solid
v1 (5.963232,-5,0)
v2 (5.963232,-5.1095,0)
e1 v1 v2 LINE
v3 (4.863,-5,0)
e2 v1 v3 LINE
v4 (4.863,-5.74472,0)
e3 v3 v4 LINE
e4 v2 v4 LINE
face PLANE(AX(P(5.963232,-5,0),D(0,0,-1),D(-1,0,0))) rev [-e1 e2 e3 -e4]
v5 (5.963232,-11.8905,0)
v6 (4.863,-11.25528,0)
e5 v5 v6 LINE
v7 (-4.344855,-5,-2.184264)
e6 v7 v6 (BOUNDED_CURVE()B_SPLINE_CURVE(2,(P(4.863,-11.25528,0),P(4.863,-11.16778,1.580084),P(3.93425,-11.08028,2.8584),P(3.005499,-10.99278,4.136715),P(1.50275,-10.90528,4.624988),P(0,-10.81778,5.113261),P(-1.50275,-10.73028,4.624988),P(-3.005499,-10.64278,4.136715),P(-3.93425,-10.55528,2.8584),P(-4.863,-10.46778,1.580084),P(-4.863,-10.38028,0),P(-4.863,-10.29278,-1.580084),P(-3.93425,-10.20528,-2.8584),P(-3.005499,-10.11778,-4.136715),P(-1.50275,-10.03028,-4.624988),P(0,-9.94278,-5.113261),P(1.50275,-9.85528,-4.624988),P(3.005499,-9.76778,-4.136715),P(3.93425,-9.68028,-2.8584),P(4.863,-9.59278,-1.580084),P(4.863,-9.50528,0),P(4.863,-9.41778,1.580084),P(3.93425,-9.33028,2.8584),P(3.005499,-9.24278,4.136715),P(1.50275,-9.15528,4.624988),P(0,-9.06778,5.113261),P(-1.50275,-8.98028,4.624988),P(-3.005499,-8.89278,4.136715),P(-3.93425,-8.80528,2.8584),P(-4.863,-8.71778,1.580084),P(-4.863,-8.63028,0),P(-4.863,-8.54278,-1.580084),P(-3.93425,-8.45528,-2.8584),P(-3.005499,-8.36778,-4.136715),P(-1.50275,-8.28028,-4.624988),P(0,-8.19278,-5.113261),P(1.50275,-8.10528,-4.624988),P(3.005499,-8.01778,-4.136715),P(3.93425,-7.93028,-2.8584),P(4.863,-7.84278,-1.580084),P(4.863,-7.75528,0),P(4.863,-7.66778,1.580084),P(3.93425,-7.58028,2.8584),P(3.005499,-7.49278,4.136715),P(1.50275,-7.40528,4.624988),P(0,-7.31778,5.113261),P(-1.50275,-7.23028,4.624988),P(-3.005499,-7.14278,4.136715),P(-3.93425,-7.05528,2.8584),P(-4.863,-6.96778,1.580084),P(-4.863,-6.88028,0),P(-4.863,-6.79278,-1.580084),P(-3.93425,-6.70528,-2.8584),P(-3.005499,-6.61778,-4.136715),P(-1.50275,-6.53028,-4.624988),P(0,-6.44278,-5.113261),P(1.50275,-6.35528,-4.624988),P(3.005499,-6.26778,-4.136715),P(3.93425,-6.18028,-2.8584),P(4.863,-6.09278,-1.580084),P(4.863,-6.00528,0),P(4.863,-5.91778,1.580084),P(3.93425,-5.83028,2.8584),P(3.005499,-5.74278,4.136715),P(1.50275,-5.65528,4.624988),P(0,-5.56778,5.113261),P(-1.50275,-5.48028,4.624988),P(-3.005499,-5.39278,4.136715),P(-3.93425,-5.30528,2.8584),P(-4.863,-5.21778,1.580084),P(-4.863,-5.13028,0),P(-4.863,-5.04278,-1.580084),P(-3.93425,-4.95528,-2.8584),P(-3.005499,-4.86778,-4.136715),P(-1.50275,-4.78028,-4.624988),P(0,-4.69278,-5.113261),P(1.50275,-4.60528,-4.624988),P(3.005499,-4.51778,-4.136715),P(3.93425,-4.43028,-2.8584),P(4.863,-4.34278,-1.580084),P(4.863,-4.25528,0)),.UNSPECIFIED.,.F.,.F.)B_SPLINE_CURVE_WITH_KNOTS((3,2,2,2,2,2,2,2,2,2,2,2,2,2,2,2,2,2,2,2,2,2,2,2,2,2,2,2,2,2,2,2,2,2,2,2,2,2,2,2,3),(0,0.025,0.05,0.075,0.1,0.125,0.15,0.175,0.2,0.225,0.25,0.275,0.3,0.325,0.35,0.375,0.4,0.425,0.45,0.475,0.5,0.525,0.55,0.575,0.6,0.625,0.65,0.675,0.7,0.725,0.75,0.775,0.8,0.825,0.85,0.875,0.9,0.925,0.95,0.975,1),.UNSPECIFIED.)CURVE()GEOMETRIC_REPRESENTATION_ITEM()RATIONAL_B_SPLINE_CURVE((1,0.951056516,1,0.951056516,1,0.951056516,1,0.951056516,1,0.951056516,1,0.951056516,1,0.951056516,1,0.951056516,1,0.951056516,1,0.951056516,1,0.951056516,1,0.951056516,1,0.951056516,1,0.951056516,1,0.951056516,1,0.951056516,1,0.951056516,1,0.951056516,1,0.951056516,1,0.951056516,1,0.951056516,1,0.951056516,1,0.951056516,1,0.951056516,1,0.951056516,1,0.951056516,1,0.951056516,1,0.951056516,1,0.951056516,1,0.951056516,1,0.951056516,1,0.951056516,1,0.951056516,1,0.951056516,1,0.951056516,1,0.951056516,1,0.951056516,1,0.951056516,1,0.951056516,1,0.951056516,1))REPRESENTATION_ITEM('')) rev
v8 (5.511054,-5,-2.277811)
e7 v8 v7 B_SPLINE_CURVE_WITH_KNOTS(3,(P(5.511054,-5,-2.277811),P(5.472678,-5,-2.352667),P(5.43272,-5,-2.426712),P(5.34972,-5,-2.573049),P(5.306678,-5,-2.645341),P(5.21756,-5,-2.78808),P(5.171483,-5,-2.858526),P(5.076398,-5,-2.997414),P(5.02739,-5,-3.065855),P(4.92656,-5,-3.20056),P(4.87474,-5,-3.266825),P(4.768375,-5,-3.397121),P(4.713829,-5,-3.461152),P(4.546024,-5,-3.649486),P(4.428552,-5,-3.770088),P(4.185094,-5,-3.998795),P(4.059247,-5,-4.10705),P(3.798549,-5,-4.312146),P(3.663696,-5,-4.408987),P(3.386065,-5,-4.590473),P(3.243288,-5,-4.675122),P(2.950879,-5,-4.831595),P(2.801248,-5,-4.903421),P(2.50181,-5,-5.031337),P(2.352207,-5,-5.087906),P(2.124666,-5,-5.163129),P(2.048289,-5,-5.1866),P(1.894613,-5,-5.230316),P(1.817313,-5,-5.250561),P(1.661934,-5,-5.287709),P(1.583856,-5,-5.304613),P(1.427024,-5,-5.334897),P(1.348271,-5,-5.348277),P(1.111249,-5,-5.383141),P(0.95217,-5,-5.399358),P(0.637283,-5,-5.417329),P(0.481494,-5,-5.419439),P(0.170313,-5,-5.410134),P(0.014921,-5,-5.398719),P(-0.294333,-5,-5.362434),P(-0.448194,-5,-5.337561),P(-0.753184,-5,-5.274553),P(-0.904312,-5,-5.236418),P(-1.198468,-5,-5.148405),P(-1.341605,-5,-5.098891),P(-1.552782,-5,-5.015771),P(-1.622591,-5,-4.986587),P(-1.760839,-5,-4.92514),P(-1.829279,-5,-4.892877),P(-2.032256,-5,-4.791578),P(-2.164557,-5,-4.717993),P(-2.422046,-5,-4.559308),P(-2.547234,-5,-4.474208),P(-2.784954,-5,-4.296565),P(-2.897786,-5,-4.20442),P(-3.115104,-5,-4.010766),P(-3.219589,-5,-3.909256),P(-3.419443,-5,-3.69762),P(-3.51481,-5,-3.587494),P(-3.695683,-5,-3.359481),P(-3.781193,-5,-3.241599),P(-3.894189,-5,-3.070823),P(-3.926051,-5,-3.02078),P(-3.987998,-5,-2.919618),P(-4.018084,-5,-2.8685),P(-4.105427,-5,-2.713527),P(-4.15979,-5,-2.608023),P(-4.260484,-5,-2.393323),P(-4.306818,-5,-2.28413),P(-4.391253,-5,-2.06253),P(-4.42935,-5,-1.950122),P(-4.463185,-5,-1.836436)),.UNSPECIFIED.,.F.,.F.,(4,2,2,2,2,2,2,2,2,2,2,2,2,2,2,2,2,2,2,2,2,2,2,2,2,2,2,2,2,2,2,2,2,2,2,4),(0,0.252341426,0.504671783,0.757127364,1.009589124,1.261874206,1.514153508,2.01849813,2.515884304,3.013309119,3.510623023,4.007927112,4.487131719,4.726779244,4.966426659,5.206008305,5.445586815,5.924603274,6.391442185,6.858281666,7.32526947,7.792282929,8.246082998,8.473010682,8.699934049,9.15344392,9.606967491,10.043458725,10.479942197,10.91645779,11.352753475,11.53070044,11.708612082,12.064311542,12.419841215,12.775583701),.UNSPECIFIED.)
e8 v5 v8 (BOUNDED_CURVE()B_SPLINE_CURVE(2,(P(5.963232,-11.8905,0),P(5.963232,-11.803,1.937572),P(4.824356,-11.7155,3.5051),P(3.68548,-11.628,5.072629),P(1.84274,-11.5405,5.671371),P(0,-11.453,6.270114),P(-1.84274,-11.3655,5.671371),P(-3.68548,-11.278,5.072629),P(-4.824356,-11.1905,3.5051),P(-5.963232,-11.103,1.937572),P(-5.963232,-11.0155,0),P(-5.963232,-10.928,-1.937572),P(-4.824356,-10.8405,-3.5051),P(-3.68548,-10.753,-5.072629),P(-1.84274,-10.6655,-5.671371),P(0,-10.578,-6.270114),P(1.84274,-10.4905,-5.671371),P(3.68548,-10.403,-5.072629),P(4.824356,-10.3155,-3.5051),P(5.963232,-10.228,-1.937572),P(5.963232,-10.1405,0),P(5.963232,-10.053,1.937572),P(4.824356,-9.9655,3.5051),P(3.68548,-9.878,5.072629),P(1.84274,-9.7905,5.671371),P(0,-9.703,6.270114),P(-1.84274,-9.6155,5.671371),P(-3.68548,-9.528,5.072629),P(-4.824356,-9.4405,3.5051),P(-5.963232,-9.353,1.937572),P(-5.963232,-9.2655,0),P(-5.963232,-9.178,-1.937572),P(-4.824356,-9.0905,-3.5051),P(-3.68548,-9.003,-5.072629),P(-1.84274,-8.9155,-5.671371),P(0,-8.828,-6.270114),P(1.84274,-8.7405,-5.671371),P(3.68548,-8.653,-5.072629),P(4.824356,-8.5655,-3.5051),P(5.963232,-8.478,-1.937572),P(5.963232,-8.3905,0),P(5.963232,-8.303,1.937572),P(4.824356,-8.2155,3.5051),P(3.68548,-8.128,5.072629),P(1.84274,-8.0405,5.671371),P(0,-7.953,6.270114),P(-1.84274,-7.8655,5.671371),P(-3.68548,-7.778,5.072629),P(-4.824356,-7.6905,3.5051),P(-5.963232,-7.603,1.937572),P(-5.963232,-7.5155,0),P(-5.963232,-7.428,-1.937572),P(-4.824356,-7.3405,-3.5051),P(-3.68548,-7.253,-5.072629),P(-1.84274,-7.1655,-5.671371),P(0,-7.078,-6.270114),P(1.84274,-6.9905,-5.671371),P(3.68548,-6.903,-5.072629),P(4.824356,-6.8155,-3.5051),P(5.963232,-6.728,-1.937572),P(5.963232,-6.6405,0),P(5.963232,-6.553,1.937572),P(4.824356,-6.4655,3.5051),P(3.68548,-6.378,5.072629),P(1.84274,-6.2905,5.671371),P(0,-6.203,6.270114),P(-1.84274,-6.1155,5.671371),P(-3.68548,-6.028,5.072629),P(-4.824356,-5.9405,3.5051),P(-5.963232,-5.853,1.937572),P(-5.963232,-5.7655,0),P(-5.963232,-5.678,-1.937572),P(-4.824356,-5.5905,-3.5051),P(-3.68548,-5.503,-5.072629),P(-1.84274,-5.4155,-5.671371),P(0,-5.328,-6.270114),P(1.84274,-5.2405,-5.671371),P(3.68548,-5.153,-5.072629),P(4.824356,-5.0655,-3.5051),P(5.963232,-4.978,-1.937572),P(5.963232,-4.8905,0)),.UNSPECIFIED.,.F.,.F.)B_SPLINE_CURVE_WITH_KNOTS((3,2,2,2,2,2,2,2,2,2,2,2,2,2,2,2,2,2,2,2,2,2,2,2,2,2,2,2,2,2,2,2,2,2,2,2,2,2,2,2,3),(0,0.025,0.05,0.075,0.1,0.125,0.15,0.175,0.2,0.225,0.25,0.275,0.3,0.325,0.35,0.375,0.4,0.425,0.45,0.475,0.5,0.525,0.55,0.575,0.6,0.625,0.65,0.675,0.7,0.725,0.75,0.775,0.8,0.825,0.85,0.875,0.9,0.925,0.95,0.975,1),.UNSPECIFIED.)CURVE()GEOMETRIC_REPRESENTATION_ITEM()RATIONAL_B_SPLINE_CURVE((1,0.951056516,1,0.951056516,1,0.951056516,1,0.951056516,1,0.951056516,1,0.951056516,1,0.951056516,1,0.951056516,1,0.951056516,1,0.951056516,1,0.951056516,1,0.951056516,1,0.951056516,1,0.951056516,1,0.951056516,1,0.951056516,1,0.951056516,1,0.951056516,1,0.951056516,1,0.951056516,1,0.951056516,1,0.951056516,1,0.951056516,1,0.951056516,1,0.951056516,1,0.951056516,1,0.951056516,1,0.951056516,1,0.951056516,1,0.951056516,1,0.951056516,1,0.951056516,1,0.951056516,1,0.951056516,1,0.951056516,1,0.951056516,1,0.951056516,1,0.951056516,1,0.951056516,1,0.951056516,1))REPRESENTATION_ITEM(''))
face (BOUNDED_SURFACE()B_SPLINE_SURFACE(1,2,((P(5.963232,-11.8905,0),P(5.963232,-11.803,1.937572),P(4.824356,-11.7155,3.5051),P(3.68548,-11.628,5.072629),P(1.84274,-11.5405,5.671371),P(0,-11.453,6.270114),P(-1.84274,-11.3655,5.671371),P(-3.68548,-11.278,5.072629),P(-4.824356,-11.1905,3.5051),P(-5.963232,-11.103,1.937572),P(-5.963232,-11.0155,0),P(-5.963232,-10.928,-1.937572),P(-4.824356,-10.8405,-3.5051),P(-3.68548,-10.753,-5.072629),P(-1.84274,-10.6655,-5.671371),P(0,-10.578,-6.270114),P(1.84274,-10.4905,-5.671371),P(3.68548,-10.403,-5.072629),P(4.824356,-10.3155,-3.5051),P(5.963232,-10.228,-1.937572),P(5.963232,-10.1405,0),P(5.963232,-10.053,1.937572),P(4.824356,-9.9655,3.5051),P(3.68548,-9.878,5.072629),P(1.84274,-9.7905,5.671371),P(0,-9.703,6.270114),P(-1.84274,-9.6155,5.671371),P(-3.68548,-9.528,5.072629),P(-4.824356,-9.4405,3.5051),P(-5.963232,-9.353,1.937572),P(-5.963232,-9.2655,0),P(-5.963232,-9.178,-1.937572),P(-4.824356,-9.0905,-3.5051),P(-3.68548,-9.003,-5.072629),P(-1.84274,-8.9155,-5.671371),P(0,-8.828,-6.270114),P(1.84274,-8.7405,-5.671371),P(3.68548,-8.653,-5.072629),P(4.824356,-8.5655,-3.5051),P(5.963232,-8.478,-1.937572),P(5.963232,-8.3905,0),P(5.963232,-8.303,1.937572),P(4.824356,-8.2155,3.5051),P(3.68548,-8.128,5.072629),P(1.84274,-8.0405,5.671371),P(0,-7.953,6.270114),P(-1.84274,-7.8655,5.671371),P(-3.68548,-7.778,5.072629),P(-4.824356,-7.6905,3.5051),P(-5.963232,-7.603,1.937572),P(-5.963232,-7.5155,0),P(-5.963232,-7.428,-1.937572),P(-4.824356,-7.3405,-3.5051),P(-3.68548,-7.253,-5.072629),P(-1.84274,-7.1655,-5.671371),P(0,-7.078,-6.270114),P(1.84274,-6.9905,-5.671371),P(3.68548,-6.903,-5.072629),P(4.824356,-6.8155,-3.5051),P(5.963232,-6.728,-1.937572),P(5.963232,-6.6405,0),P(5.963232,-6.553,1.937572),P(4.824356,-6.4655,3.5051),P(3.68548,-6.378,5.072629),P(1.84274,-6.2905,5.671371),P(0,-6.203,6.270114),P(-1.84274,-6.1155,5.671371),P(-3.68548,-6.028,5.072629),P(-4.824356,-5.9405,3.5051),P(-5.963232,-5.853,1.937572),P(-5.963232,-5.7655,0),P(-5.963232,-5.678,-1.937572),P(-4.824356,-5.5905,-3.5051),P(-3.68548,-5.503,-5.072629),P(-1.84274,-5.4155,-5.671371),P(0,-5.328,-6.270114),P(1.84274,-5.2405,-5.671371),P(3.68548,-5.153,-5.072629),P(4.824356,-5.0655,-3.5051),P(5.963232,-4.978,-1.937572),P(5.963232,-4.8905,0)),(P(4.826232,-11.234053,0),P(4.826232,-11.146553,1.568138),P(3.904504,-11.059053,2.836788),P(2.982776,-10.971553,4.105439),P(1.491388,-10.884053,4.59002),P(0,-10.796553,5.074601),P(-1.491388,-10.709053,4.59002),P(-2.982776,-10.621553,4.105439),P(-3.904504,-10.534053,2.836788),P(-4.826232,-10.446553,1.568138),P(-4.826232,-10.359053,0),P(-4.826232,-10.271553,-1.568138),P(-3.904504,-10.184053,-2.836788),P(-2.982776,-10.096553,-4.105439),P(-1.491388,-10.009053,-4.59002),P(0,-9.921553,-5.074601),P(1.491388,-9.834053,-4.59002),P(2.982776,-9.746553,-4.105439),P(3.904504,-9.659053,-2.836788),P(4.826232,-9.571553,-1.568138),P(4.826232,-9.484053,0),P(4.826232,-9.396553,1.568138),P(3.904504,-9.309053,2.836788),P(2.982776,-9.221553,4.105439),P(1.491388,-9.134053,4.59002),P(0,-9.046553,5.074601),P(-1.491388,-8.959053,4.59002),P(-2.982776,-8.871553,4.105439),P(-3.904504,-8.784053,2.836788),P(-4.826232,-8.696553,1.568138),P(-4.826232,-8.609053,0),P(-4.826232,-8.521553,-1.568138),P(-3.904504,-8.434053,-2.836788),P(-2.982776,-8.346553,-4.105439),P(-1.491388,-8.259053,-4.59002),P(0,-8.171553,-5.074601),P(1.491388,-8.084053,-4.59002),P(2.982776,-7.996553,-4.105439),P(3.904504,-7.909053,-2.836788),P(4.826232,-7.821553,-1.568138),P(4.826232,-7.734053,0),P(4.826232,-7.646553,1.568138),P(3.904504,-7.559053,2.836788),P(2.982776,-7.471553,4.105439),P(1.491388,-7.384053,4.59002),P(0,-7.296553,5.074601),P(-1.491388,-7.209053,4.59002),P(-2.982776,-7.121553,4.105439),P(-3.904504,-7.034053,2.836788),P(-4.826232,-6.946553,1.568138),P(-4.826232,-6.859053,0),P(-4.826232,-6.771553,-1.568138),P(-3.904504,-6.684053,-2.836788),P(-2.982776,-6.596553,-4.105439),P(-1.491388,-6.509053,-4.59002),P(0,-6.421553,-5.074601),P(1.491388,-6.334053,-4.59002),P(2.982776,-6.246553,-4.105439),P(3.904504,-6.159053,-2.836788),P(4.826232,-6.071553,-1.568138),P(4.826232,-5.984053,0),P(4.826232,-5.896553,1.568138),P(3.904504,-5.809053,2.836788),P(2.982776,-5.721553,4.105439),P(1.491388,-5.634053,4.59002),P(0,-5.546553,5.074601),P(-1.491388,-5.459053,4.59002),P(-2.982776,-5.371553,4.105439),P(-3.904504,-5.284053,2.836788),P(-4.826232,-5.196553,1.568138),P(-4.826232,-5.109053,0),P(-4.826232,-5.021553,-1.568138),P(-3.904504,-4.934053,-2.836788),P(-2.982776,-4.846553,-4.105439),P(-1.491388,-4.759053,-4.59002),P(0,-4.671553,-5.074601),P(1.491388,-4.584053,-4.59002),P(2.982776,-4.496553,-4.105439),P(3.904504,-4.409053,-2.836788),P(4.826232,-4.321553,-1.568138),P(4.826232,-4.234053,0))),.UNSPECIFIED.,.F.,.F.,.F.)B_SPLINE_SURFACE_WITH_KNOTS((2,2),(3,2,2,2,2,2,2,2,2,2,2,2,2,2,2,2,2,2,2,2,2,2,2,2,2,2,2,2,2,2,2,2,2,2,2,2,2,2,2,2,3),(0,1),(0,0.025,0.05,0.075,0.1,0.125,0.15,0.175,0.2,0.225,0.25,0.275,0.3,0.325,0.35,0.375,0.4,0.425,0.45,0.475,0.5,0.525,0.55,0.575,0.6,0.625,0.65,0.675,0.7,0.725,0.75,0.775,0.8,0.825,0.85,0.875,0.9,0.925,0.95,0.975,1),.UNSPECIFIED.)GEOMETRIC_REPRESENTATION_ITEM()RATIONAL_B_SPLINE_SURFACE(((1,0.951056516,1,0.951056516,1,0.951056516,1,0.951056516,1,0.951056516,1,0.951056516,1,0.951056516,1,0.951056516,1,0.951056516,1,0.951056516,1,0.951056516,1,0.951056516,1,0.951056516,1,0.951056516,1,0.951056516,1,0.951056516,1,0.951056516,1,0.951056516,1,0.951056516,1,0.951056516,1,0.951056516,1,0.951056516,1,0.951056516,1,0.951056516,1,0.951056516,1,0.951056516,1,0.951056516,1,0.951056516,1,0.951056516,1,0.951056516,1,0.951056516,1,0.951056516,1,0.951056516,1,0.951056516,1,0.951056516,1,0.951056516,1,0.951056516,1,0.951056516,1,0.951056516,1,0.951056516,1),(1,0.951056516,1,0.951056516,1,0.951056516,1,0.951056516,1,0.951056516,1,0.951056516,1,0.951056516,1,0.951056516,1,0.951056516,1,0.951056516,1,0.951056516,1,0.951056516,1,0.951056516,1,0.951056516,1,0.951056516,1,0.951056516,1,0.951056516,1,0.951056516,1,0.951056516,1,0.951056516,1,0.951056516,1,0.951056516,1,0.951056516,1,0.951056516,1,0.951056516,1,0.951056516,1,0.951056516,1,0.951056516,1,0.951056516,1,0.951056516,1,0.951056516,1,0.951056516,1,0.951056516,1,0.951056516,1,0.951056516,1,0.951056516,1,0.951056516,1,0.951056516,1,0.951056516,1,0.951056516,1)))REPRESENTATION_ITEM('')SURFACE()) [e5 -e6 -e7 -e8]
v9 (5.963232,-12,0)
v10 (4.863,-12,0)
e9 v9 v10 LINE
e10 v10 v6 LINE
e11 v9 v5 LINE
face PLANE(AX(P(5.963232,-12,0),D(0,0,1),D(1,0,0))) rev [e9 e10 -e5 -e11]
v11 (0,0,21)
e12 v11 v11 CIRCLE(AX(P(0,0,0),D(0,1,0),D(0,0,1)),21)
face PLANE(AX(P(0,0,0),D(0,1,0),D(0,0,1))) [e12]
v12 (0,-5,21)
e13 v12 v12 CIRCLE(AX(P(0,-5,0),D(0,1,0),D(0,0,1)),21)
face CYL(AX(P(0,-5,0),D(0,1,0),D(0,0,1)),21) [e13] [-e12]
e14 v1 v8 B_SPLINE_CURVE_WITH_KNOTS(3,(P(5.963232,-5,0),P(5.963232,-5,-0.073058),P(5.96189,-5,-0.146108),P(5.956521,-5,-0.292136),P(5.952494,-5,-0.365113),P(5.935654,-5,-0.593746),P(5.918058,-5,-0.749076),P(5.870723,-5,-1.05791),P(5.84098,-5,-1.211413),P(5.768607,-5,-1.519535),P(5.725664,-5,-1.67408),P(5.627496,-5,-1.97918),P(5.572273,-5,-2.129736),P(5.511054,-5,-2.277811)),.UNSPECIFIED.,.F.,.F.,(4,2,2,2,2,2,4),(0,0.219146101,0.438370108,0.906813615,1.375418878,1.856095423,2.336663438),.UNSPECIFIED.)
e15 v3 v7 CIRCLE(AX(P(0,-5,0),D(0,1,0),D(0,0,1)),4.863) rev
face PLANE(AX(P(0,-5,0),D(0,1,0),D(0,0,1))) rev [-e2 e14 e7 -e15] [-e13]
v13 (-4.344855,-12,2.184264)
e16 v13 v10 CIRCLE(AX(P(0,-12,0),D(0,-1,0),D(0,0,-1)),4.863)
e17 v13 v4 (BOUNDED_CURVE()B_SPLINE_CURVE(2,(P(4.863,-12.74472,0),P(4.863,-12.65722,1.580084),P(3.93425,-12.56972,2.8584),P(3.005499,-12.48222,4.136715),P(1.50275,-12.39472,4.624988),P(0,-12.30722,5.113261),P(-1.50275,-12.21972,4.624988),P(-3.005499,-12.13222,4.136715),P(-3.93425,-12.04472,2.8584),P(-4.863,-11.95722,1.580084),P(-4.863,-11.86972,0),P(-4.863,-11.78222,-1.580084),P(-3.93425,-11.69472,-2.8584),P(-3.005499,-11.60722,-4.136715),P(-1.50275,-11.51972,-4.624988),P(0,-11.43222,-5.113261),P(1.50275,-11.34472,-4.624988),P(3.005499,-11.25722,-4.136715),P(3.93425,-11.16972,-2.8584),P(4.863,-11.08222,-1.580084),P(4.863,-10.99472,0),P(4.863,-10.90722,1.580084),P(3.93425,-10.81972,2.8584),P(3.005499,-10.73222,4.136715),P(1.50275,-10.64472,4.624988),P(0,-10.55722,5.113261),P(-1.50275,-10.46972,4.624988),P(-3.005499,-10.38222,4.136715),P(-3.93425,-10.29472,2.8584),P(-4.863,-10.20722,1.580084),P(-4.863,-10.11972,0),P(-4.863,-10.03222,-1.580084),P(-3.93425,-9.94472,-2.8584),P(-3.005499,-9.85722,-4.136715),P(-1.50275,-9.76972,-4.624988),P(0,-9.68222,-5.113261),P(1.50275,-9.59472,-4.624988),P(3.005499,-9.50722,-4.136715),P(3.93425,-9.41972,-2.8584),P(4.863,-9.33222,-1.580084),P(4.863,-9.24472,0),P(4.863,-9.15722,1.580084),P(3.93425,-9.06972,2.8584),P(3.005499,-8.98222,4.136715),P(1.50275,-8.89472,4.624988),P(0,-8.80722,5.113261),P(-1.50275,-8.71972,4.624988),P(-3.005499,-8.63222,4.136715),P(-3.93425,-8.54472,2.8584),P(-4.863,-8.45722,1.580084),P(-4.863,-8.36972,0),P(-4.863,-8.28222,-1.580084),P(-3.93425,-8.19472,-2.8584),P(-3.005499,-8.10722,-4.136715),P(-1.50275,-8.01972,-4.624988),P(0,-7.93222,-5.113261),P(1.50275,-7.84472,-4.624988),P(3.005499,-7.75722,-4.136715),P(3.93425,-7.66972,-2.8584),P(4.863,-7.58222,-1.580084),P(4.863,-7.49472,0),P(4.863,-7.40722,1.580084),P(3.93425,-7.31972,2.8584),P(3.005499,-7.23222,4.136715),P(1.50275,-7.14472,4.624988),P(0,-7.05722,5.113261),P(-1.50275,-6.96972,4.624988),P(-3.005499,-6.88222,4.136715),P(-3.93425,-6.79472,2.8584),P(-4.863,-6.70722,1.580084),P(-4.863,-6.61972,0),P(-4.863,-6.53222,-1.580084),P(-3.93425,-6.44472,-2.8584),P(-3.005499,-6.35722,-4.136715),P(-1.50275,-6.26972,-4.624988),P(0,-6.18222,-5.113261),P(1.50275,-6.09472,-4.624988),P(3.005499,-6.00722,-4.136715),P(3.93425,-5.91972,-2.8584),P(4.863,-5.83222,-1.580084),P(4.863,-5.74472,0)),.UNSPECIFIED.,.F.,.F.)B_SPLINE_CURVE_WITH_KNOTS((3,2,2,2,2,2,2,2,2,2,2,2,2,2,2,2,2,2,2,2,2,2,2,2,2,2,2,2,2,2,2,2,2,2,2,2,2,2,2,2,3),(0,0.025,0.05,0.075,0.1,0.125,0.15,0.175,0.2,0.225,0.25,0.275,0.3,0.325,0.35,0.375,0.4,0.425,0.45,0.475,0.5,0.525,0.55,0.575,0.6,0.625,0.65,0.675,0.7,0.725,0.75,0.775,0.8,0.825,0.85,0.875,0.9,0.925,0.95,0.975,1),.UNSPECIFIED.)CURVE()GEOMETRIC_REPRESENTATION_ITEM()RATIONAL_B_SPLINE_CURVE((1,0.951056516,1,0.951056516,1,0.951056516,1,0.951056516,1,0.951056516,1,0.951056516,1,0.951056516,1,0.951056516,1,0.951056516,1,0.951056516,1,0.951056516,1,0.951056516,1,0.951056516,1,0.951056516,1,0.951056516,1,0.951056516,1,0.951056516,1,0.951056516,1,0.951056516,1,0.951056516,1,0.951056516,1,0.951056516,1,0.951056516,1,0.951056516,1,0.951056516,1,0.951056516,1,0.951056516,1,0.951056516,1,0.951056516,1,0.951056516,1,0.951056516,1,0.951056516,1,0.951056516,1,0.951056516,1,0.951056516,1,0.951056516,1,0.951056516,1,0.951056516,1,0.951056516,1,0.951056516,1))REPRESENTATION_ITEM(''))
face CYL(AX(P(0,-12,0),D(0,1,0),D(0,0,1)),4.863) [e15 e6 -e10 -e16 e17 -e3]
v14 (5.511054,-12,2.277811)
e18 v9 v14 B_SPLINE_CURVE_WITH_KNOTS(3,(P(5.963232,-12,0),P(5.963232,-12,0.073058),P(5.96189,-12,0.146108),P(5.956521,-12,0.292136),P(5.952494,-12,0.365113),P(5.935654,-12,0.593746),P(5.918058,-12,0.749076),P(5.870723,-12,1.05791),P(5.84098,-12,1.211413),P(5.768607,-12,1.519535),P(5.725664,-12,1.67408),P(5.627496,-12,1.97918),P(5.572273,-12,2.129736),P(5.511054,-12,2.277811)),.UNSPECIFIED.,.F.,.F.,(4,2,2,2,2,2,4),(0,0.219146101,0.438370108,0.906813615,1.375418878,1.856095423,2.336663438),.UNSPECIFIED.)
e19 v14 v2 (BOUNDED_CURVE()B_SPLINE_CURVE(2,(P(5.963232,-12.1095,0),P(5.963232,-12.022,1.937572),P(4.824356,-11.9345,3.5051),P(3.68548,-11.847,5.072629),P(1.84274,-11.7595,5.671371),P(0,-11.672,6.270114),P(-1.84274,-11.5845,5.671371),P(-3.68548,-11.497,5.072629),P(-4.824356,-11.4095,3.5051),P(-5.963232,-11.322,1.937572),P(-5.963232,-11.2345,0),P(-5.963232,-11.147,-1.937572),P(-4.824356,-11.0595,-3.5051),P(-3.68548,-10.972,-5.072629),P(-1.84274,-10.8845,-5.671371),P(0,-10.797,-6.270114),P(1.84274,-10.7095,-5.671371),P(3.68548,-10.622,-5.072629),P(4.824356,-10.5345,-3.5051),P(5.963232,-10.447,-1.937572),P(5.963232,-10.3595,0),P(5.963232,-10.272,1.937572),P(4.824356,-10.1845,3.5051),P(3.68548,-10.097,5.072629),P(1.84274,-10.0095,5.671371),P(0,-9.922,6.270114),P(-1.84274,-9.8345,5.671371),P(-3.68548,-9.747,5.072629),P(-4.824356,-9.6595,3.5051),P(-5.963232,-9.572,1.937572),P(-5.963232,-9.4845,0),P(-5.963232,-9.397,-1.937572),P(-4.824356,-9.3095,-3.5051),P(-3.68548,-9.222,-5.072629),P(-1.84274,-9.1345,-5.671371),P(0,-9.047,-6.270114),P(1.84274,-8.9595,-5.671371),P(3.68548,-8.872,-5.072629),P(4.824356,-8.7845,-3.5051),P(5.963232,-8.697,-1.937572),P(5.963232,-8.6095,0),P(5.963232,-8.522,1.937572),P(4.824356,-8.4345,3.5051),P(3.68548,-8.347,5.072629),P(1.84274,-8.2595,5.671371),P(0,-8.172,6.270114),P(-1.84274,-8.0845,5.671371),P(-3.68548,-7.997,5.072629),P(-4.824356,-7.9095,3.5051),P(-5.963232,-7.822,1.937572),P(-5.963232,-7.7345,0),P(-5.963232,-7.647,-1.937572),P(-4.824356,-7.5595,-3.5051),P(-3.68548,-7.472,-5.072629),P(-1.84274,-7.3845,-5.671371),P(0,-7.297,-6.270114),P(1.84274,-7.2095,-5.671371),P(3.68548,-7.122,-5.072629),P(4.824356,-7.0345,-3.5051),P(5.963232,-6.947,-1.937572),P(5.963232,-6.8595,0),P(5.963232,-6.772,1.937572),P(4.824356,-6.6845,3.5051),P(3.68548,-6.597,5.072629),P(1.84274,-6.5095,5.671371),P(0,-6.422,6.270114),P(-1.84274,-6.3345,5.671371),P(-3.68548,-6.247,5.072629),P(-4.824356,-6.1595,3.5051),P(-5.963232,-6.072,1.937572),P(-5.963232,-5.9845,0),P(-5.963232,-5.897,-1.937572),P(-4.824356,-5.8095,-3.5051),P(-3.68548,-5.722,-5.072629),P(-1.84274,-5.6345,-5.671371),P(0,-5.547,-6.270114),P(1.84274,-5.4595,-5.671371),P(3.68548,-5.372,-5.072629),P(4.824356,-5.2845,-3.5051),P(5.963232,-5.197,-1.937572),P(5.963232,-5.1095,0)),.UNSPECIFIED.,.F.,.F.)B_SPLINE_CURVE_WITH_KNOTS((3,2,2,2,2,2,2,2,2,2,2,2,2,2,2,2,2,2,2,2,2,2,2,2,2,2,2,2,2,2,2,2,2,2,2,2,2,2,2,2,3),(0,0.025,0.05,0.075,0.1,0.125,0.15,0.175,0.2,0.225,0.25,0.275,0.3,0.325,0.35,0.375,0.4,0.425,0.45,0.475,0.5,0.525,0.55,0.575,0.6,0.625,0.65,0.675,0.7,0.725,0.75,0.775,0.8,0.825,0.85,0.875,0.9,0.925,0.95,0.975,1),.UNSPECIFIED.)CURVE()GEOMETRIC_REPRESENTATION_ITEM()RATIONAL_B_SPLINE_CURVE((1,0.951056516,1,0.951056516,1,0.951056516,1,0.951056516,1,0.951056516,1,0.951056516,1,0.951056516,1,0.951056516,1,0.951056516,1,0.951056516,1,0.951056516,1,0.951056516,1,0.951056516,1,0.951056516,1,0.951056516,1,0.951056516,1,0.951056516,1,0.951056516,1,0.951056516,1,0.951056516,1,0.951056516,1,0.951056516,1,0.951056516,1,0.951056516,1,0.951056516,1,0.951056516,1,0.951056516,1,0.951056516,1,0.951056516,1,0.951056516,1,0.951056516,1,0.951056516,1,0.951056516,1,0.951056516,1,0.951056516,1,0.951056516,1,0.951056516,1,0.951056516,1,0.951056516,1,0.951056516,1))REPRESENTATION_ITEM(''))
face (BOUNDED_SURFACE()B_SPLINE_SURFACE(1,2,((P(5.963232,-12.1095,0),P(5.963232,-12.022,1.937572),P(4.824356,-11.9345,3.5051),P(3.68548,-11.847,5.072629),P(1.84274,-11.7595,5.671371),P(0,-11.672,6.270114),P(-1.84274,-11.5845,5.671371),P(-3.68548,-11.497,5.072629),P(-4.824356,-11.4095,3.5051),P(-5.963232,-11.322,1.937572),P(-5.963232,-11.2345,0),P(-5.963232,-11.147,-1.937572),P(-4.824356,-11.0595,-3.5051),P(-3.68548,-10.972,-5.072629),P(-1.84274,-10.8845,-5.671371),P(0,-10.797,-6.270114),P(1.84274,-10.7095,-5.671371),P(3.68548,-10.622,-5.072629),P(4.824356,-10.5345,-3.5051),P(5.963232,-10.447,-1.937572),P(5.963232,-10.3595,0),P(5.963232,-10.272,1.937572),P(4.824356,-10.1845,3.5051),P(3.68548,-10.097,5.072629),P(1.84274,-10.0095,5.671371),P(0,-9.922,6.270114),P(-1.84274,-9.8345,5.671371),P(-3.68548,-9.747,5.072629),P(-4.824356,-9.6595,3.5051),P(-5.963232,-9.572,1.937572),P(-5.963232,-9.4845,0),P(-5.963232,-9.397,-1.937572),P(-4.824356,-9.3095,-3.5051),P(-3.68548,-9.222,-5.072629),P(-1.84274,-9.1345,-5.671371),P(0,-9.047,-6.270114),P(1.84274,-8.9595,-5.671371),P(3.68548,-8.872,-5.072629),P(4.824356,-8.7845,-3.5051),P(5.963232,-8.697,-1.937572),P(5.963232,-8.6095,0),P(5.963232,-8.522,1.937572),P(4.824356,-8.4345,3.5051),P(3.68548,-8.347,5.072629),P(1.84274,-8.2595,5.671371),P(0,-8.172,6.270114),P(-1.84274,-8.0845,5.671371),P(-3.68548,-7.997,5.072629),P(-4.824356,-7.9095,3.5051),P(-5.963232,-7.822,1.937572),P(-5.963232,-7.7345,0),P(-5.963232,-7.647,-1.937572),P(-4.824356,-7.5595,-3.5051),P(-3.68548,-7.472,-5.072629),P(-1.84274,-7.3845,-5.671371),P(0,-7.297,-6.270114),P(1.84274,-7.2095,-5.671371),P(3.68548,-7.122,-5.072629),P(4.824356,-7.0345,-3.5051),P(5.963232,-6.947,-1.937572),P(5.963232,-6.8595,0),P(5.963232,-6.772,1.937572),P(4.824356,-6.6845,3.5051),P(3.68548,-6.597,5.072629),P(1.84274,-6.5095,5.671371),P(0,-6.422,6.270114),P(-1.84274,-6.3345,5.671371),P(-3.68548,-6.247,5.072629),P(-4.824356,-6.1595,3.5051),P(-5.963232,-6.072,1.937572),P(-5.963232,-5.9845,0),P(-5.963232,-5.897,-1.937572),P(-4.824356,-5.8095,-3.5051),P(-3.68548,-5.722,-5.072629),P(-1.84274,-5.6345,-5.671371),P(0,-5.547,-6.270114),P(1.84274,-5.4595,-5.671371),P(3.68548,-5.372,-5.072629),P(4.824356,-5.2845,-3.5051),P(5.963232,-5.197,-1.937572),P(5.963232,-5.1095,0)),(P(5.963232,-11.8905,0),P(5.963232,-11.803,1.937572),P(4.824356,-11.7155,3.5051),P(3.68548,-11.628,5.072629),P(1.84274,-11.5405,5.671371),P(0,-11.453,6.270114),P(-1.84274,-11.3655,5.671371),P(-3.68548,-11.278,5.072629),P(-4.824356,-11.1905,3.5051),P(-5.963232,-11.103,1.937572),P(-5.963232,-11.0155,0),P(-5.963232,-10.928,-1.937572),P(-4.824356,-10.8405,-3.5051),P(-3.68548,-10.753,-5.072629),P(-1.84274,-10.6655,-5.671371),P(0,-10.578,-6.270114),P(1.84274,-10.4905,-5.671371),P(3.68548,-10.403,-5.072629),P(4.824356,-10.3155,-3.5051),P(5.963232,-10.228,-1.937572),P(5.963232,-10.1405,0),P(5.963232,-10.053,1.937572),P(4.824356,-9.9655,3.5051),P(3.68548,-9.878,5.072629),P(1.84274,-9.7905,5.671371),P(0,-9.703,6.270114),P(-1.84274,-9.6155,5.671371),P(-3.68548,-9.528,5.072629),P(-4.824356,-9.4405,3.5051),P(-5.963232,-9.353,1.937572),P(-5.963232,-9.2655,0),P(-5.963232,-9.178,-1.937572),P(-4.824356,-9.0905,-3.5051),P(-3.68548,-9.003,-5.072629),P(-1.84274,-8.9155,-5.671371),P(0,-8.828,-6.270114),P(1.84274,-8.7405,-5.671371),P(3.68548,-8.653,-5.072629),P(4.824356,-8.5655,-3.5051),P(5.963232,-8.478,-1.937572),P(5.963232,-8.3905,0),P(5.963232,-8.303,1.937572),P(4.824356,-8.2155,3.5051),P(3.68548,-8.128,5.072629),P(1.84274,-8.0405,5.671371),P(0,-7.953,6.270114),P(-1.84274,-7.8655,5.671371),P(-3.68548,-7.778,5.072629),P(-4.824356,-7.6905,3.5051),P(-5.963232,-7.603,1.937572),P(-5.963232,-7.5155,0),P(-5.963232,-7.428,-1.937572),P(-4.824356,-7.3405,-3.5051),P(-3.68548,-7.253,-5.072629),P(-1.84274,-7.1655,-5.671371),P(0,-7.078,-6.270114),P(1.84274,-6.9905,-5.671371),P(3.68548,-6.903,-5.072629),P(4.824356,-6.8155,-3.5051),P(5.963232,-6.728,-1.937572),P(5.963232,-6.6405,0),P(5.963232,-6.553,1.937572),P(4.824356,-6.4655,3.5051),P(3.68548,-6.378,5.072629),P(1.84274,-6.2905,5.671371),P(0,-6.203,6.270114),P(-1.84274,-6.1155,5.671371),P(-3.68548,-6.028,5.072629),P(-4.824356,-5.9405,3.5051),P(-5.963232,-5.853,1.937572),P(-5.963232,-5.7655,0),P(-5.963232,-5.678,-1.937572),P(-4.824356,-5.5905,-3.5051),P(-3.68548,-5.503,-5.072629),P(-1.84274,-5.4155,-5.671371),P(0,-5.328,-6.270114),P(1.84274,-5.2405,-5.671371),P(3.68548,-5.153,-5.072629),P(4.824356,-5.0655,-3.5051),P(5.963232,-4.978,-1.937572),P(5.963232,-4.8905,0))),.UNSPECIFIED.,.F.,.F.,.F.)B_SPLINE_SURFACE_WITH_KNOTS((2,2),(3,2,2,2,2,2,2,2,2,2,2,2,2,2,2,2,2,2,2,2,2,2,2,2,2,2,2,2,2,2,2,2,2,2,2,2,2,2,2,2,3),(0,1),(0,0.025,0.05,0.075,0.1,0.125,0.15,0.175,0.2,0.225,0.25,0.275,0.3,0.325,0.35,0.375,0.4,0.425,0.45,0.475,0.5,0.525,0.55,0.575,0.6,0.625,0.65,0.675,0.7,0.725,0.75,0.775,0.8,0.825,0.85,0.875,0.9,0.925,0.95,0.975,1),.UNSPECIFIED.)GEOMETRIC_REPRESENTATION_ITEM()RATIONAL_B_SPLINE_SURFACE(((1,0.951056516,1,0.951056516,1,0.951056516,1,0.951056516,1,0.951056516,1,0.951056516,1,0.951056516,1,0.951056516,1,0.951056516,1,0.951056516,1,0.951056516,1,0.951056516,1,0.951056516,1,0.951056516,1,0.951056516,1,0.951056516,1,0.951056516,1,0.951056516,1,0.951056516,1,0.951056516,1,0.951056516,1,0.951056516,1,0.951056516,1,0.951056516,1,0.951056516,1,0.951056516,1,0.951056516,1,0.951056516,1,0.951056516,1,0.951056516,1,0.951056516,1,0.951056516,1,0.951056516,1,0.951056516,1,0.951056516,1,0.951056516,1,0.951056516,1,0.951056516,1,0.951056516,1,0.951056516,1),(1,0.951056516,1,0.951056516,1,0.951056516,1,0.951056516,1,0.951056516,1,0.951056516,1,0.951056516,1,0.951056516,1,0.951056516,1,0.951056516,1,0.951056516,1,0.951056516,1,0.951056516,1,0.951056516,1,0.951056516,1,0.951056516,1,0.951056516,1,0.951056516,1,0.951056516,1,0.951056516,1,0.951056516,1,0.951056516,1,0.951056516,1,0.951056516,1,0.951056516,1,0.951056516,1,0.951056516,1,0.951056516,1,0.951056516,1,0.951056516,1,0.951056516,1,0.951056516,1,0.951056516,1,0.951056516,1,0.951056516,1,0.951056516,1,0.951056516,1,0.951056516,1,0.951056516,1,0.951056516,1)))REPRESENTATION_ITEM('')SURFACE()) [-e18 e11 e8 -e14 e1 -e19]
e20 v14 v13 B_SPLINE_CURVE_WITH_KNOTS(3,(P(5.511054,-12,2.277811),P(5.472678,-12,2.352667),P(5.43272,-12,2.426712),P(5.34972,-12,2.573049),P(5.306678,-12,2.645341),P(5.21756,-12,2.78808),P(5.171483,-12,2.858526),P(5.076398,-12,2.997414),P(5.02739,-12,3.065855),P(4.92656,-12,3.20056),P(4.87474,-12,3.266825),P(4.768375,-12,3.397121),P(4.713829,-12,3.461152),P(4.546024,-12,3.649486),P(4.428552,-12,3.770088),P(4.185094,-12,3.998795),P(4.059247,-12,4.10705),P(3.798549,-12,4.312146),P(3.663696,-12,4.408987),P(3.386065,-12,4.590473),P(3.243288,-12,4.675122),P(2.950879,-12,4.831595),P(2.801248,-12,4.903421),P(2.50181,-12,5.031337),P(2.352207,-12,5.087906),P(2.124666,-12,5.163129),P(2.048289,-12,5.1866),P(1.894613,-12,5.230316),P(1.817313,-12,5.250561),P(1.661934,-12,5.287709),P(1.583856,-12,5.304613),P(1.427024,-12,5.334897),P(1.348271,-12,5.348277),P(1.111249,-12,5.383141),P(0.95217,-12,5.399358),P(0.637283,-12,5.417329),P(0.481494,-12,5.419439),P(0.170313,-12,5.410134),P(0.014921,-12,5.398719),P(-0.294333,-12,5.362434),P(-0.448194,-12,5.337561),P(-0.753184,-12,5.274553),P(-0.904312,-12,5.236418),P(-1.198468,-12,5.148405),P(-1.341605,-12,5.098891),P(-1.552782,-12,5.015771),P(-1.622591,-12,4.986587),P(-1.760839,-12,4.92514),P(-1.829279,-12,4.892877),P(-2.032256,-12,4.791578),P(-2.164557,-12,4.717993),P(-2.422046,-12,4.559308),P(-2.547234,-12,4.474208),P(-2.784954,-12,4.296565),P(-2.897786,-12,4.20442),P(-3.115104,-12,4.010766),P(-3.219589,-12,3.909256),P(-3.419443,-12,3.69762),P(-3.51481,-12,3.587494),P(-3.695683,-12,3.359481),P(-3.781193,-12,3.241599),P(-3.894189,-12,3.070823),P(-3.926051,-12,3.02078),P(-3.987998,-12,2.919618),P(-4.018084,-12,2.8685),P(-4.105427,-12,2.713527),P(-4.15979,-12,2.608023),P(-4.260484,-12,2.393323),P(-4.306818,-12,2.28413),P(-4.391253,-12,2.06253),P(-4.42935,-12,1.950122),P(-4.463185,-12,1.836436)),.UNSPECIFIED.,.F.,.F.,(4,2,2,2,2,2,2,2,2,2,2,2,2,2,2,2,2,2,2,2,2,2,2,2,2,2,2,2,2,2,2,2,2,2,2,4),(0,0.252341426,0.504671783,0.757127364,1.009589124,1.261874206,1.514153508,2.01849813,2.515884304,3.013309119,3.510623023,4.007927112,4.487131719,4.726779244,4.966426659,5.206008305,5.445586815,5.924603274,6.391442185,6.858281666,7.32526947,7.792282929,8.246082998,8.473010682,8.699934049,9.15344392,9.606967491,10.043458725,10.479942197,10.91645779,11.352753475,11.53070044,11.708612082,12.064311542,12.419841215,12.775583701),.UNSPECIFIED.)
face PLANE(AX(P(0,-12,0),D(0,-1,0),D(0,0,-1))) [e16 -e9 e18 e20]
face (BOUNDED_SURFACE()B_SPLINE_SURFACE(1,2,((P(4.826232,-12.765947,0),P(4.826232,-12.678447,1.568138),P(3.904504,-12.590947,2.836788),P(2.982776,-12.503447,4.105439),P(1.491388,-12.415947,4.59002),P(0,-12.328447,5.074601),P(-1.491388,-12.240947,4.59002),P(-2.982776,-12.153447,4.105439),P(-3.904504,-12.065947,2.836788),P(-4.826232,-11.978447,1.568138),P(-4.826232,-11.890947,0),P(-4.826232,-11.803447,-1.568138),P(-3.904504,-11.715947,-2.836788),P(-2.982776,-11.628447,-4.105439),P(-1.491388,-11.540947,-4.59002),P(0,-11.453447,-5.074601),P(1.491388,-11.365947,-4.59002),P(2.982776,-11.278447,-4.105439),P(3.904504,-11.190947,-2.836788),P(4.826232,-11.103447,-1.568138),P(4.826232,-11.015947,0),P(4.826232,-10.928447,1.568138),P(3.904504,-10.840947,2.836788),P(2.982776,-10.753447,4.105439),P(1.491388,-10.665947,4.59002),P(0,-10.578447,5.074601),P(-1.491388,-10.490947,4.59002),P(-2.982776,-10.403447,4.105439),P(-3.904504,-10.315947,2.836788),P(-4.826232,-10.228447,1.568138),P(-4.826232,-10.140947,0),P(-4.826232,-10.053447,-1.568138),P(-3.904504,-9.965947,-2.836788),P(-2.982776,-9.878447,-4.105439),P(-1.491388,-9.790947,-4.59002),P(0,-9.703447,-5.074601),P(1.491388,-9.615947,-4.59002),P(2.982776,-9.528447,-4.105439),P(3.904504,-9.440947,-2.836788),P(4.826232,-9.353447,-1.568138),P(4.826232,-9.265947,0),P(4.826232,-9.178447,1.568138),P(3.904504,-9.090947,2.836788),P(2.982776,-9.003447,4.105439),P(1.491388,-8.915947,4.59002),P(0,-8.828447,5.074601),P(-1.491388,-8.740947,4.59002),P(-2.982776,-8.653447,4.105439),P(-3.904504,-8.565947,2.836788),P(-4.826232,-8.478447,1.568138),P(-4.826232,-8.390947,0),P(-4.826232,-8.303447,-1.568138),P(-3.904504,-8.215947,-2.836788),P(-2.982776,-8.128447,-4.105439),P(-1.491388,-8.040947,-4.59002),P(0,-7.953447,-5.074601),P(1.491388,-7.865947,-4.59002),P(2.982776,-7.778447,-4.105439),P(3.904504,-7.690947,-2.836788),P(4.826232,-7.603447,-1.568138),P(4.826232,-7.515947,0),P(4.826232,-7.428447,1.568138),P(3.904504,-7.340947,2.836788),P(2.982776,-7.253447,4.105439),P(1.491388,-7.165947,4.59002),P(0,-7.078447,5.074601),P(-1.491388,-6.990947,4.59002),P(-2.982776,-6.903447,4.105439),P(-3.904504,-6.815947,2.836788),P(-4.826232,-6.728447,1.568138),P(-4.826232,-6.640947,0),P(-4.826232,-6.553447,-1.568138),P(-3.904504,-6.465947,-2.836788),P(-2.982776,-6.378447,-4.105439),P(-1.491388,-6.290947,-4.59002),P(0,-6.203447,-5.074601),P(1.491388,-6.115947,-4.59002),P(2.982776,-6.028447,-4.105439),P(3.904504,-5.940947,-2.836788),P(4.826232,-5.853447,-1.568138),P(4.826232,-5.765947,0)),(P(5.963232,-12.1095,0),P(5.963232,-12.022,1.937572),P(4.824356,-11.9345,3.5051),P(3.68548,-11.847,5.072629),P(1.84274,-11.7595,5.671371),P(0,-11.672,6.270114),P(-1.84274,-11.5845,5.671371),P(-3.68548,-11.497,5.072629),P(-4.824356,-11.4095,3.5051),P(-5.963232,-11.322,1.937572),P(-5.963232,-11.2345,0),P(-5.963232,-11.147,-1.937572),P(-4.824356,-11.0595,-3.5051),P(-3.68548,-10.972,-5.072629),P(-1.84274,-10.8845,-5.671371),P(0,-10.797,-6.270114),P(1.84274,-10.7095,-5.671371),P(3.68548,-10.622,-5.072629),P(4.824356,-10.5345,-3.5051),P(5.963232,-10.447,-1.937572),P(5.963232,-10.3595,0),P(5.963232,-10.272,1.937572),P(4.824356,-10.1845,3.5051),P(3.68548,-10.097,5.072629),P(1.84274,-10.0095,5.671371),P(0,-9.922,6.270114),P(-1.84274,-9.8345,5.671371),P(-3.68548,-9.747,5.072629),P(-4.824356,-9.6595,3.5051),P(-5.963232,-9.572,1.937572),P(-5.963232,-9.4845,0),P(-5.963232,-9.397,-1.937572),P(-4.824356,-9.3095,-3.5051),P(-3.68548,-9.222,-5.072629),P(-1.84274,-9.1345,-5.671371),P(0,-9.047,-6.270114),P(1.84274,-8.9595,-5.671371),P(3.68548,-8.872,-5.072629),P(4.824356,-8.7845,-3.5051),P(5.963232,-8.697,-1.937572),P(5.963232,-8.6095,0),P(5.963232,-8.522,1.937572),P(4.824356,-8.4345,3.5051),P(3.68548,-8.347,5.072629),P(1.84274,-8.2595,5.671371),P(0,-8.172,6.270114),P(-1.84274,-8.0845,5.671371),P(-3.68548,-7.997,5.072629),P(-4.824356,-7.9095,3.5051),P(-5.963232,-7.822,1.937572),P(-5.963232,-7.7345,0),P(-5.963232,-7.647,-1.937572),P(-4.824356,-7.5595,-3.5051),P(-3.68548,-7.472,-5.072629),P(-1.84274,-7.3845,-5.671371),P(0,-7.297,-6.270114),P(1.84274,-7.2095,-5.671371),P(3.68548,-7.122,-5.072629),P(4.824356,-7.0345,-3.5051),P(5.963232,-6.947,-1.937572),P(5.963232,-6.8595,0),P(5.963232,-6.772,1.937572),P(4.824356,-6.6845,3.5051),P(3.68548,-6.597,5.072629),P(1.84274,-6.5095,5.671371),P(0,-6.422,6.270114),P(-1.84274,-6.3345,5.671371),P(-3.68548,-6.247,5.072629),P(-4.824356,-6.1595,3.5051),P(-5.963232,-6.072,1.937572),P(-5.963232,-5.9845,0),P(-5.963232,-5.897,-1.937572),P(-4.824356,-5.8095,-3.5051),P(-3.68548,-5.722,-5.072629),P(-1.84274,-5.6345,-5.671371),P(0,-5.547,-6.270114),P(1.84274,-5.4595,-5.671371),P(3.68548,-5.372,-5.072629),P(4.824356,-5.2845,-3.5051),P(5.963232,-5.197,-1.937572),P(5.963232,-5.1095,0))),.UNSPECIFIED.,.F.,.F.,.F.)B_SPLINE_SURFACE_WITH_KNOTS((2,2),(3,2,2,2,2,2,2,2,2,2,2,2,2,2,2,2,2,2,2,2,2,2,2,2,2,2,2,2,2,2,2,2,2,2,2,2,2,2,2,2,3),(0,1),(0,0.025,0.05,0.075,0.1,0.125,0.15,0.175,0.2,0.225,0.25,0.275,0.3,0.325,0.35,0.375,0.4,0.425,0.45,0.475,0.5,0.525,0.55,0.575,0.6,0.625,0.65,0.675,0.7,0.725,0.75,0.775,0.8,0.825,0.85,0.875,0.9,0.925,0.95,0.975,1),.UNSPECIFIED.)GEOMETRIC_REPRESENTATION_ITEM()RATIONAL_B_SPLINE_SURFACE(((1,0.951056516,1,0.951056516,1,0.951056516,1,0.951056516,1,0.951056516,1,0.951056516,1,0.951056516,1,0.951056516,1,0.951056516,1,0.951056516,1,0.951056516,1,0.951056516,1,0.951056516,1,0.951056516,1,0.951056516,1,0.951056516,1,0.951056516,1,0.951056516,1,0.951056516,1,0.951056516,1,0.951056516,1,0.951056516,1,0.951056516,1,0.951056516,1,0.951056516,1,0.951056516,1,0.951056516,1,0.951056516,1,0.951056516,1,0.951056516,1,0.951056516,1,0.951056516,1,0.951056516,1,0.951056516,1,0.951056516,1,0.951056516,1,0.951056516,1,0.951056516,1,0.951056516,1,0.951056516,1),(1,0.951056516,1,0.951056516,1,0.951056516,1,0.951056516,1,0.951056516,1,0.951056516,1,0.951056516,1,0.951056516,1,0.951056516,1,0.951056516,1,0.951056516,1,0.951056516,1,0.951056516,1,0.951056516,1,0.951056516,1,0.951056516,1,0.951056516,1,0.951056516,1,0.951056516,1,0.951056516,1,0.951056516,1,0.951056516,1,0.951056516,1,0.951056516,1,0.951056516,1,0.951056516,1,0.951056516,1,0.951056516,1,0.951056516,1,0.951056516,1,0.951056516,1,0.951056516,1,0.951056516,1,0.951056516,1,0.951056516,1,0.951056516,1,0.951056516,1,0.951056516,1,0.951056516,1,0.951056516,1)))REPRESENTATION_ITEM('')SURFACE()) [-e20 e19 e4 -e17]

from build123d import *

# Parameters (mm, degrees)
SKETCH1_R               = 21
BOSS_EXTRUDE1_DEPTH     = 5
SKETCH2_R               = 4.863
BOSS_EXTRUDE2_DEPTH     = 7
SWEEP1_PITCH            = 1.75
SWEEP1_HEIGHT           = 7
SWEEP1_RADIUS           = 6
SWEEP1_START_ANGLE      = 90
CUT_EXTRUDE1_DEPTH      = 33.325986765
CUT_EXTRUDE1_DEPTH_BACK = 33.325986765


with BuildPart() as part:
    # Sketch1 → Boss-Extrude1 (new body)
    with BuildSketch(Plane(origin=(0, 0, 0), x_dir=(1, 0, 0), z_dir=(0, 1, 0))):
        Circle(SKETCH1_R)
    extrude(amount=-BOSS_EXTRUDE1_DEPTH)

    # Sketch2 → Boss-Extrude2 (add)
    with BuildSketch(Plane.XZ.offset(5)):
        Circle(SKETCH2_R)
    extrude(amount=BOSS_EXTRUDE2_DEPTH)

    # Sweep1: sweep along a helix
    with BuildLine() as sweep1_path:
        add(Helix(SWEEP1_PITCH, SWEEP1_HEIGHT, SWEEP1_RADIUS, center=(0, -12, 0), direction=(0, 1, 0), lefthand=True, mode=Mode.PRIVATE).rotate(Axis((0, -12, 0), (0, 1, 0)), SWEEP1_START_ANGLE))
    # Sketch11 → Sweep1 (sweep)
    with BuildSketch(Plane.XY):
        Polygon((4.826232454, -5), (4.826232454, -5.765947256), (5.963232454, -5.1095), (5.963232454, -4.8905), (4.826232454, -4.234052744), align=None)
    sweep(path=sweep1_path.line, is_frenet=True)

    # Sketch12 → Cut-Extrude1 (cut, two sides: drawn at the far end of the back side and taken through both)
    with BuildSketch(Plane.XY.offset(-CUT_EXTRUDE1_DEPTH_BACK)):
        Polygon((0, -12), (5.963232454, -12), (5.963232454, -12.765947256), (0, -12.765947256), (-4.863, -12.765947256), (-4.863, -12), align=None)
    extrude(amount=CUT_EXTRUDE1_DEPTH + CUT_EXTRUDE1_DEPTH_BACK, mode=Mode.SUBTRACT)


solid = part.part
